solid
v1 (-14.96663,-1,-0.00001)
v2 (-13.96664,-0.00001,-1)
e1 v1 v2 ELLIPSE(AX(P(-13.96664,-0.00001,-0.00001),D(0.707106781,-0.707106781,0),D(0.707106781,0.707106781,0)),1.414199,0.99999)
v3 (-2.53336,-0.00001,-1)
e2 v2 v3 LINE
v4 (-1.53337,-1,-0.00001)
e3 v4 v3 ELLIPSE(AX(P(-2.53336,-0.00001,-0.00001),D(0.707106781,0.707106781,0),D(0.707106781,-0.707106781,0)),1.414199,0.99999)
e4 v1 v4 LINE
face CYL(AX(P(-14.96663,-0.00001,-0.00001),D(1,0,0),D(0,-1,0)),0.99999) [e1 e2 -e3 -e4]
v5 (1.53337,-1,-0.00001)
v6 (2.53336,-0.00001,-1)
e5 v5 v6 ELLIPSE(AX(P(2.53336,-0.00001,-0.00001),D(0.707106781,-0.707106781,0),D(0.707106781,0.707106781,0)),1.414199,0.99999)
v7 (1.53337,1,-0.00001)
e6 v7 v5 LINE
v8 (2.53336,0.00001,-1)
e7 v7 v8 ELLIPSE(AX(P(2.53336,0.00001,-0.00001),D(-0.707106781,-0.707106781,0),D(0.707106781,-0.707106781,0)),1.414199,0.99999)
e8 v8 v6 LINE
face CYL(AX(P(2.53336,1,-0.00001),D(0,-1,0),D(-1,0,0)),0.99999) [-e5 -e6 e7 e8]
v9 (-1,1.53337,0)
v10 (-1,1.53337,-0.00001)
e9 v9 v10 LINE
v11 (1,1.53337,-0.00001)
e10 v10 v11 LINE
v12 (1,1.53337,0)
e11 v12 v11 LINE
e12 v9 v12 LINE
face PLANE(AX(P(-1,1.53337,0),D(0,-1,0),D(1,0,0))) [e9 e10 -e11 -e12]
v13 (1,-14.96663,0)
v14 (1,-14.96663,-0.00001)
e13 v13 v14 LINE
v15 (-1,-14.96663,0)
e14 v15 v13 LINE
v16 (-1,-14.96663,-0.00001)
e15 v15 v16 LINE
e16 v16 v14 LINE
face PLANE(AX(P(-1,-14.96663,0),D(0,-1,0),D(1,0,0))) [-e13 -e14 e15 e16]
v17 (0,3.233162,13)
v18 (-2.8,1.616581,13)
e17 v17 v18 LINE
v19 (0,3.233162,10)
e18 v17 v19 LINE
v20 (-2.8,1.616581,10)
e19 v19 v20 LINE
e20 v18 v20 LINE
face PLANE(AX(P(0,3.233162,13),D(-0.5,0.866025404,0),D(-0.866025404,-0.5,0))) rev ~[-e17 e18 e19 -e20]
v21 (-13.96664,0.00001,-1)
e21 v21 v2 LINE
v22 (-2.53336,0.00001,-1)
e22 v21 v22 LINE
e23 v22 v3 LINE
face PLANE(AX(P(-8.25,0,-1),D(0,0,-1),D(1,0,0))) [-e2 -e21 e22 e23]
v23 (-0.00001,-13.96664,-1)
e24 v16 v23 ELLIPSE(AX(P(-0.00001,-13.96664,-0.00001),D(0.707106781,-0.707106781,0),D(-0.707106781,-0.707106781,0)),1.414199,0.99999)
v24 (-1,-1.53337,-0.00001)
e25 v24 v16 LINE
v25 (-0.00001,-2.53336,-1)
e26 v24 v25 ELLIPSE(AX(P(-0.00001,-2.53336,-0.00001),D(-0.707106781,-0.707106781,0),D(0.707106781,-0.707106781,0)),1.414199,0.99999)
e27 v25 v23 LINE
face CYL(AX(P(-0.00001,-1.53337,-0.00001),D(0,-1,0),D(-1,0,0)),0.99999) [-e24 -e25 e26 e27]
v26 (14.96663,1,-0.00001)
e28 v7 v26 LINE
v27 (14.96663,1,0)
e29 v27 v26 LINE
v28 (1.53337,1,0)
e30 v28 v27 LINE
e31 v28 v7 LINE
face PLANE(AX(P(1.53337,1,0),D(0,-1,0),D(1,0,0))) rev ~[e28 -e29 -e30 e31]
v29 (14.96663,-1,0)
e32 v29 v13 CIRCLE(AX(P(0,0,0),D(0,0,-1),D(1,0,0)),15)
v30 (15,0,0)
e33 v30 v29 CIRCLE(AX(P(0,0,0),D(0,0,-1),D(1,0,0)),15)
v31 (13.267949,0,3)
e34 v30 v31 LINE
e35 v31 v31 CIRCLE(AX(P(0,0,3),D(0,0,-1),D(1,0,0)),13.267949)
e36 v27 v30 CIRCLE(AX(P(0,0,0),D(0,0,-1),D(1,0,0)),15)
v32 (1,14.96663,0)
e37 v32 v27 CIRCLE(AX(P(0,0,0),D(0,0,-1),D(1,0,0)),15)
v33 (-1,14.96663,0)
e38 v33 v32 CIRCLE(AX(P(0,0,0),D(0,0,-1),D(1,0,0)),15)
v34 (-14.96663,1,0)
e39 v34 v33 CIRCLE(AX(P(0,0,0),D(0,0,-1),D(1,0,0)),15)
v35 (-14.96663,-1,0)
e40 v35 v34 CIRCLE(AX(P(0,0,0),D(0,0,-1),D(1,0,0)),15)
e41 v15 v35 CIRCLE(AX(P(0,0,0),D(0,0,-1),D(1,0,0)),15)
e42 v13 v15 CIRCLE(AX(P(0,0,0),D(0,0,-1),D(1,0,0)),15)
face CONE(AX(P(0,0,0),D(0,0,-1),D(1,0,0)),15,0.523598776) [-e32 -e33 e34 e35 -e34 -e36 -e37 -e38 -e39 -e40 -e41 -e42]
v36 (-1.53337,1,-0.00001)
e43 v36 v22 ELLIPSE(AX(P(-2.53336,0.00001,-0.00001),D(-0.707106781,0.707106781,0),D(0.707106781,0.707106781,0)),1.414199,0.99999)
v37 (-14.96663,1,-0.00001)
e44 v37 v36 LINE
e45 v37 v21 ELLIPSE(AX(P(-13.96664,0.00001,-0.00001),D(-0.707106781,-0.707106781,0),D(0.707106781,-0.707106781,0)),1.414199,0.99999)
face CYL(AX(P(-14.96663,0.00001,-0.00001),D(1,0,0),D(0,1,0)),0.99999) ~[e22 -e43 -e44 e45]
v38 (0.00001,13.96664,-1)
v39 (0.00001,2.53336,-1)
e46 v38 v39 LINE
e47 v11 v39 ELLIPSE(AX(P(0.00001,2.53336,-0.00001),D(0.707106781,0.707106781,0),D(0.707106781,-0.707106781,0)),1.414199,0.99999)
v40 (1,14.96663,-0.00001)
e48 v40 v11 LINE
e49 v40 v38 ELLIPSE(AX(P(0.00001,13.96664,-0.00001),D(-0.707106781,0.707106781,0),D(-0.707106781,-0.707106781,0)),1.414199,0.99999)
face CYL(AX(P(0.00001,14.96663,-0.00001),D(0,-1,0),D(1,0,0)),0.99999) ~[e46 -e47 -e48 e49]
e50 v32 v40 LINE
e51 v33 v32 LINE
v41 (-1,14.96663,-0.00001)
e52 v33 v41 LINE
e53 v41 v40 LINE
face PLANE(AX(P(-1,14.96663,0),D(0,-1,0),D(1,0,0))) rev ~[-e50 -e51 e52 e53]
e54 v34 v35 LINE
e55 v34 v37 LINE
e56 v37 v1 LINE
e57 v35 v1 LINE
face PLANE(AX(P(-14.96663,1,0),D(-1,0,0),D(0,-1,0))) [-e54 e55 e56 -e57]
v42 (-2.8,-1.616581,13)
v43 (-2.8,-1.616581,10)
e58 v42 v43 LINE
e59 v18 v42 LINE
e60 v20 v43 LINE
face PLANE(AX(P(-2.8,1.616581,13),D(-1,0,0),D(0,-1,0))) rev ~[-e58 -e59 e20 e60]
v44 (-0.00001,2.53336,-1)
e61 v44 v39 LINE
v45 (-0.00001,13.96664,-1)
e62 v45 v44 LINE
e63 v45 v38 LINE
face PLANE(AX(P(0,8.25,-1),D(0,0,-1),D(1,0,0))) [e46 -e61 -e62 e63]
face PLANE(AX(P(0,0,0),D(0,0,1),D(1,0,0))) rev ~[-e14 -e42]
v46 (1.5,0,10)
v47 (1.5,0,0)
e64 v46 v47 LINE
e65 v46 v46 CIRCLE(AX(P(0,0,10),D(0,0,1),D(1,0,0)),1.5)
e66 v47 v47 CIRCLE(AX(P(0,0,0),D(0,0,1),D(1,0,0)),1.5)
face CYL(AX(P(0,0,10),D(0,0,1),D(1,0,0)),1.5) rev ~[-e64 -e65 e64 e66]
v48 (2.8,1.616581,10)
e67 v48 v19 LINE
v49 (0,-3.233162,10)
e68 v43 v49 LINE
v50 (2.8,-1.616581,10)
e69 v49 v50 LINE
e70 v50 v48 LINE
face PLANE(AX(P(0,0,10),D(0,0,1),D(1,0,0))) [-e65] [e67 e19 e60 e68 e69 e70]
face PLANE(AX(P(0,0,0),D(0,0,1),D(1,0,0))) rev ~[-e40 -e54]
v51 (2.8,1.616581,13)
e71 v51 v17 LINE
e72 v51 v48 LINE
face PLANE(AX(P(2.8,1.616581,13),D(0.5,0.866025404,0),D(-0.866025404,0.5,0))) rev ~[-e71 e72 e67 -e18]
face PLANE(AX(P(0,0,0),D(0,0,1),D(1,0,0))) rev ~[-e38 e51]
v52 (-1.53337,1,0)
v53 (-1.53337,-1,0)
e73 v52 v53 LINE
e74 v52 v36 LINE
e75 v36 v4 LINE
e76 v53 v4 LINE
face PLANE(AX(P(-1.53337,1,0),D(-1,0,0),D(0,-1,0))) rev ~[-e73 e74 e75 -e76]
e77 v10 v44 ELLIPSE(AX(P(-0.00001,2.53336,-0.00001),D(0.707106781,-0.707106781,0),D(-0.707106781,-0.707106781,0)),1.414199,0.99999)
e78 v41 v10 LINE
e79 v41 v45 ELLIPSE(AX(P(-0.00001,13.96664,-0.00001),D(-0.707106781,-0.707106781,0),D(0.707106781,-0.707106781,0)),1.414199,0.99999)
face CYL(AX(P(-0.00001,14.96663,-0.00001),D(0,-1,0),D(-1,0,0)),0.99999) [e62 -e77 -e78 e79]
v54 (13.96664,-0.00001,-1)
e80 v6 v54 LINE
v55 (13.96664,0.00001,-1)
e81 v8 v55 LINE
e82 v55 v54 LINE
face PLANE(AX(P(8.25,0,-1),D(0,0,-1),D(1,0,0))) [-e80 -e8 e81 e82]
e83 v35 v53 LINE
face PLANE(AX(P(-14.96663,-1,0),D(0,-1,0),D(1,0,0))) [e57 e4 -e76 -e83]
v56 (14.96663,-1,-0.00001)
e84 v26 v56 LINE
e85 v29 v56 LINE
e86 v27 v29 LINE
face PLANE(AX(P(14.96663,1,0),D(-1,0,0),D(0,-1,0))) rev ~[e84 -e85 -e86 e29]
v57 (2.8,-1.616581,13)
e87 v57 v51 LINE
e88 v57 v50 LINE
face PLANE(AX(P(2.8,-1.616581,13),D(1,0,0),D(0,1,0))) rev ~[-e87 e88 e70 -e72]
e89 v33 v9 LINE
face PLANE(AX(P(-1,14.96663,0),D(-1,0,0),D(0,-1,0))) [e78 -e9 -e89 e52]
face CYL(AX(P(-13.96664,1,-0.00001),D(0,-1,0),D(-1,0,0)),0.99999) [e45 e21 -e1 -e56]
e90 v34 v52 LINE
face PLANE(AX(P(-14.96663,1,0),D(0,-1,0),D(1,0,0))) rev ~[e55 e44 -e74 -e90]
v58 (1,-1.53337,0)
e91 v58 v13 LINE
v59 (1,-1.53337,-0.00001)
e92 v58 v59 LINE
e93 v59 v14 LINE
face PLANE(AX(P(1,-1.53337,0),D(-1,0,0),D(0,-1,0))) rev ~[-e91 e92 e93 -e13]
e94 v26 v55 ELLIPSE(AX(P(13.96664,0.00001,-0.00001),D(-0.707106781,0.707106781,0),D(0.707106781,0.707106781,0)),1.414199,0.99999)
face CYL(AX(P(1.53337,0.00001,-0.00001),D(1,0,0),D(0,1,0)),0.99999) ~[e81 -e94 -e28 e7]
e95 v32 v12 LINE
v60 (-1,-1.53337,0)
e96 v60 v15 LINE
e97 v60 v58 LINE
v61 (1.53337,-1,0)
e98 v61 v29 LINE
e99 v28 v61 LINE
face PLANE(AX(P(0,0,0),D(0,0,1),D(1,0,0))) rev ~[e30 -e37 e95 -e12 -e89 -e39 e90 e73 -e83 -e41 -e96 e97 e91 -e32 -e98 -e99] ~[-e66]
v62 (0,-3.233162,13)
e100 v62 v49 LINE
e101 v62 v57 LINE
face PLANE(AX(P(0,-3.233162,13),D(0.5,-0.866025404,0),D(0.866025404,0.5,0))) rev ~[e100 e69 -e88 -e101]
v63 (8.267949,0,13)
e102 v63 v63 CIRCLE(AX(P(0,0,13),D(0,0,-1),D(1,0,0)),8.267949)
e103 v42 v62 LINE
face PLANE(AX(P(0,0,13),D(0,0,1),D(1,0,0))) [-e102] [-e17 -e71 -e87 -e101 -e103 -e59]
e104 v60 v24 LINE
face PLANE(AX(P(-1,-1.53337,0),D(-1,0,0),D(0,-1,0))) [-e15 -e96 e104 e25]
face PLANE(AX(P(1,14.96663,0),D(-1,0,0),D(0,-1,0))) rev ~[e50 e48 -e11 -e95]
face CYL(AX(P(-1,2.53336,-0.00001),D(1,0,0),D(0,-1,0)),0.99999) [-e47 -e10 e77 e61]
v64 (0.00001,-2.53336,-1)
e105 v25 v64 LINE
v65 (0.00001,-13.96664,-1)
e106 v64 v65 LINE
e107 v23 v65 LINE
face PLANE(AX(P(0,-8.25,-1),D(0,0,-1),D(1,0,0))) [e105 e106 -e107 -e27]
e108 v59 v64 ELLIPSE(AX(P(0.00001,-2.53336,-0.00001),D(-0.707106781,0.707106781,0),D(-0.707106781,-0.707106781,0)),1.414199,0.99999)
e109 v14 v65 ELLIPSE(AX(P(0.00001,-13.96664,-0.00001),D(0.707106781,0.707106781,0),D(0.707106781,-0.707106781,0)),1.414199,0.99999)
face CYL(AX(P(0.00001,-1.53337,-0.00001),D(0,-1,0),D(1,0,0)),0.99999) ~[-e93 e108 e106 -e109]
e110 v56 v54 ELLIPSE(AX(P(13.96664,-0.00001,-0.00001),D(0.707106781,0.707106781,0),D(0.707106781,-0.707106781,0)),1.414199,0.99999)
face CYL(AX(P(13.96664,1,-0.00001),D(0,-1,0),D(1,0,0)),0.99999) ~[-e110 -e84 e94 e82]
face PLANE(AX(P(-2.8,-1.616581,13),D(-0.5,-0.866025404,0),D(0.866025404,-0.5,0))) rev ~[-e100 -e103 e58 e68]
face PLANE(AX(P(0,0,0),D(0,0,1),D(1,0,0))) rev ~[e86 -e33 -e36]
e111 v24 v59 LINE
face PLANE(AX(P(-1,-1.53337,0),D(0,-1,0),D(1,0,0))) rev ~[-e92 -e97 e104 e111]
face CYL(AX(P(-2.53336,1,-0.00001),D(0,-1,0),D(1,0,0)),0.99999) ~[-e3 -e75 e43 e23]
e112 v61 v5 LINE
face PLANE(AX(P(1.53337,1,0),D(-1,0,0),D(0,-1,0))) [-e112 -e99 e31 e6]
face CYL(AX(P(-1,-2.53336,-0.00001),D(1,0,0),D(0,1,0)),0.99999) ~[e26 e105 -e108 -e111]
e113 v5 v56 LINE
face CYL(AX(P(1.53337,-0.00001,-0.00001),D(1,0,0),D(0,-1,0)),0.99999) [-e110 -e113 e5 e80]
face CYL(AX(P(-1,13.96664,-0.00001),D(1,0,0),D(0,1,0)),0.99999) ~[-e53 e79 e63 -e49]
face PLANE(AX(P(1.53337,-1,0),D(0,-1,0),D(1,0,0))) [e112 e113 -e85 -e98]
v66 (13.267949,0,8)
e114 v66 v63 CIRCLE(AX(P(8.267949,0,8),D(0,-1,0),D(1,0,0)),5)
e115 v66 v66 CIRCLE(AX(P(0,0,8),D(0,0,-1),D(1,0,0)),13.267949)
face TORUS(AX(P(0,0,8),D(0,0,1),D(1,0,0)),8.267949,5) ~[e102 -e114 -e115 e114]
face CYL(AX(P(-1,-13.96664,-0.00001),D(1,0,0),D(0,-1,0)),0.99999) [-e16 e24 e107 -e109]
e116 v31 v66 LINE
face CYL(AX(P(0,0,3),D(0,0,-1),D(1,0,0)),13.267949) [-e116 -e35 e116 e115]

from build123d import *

# Parameters (mm, degrees)
F0_R     = 15
F1_DEPTH = 3
F1_TAPER = 30
F2_DEPTH = 10
F4_DEPTH = 3
F5_R     = 1.5
F6_DEPTH = 10.001
F7_W     = 13.4332590942
F7_H     = 2
F7_W_2   = 2
F7_H_2   = 13.4332590942
F8_DEPTH = 1
F9_R     = 0.99999
F10_R    = 5


# Not quite as in the source:
# - a fillet or chamfer is up to 0.001 mm smaller than in the source, because OpenCascade refuses the exact size


with BuildPart() as f1:
    # F0 (on Top) → F1 (new body)
    with BuildSketch(Plane.XY):
        Circle(F0_R)
    extrude(amount=F1_DEPTH, taper=F1_TAPER)

    # F2 (add): a face of the model
    f2_faces = [f1.faces().sort_by_distance(p)[0] for p in [
        (0, 0, 3),
    ]]
    extrude(f2_faces, amount=F2_DEPTH)

    # F3 (on face) → F4 (cut)
    with BuildSketch(Plane.XY.offset(13)):
        Polygon((2.8, -1.6165807537), (2.8, 1.6165807537), (0, 3.2331615075), (-2.8, 1.6165807537), (-2.8, -1.6165807537), (0, -3.2331615075), align=None)
    extrude(amount=-F4_DEPTH, mode=Mode.SUBTRACT)

    # F5 (on face) → F6 (cut, through all)
    with BuildSketch(Plane.XY.offset(10)):
        Circle(F5_R)
    extrude(amount=-F6_DEPTH, mode=Mode.SUBTRACT)

    # F7 (on face) → F8 (join)
    with BuildSketch(Plane(origin=(0, 0, 0), x_dir=(1, 0, 0), z_dir=(0, 0, -1))):
        with Locations((-8.25, 0)):
            Rectangle(F7_W, F7_H)
        with Locations((0, 8.25)):
            Rectangle(F7_W_2, F7_H_2)
        with Locations((8.25, 0)):
            Rectangle(F7_W, F7_H)
        with Locations((0, -8.25)):
            Rectangle(F7_W_2, F7_H_2)
    extrude(amount=F8_DEPTH)

    # F9 (radius 1 in the source; OpenCascade refuses exactly that, so slightly less here)
    f9_edges = [f1.edges().sort_by_distance(p)[0] for p in [
        (-1, 8.25, -1),
        (1, 8.25, -1),
        (8.25, 1, -1),
        (14.96663, 0, -1),
        (8.25, -1, -1),
        (1.53337, 0, -1),
        (-8.25, 1, -1),
        (-8.25, -1, -1),
        (1, -8.25, -1),
        (-1, -8.25, -1),
        (0, 14.96663, -1),
        (0, 1.53337, -1),
        (0, -1.53337, -1),
        (-1.53337, 0, -1),
        (-14.96663, 0, -1),
        (0, -14.96663, -1),
    ]]
    fillet(f9_edges, radius=F9_R)

    # F10
    f10_edges = [f1.edges().sort_by_distance(p)[0] for p in [
        (-13.267949, 0, 13),
    ]]
    fillet(f10_edges, radius=F10_R)


solid = f1.part
